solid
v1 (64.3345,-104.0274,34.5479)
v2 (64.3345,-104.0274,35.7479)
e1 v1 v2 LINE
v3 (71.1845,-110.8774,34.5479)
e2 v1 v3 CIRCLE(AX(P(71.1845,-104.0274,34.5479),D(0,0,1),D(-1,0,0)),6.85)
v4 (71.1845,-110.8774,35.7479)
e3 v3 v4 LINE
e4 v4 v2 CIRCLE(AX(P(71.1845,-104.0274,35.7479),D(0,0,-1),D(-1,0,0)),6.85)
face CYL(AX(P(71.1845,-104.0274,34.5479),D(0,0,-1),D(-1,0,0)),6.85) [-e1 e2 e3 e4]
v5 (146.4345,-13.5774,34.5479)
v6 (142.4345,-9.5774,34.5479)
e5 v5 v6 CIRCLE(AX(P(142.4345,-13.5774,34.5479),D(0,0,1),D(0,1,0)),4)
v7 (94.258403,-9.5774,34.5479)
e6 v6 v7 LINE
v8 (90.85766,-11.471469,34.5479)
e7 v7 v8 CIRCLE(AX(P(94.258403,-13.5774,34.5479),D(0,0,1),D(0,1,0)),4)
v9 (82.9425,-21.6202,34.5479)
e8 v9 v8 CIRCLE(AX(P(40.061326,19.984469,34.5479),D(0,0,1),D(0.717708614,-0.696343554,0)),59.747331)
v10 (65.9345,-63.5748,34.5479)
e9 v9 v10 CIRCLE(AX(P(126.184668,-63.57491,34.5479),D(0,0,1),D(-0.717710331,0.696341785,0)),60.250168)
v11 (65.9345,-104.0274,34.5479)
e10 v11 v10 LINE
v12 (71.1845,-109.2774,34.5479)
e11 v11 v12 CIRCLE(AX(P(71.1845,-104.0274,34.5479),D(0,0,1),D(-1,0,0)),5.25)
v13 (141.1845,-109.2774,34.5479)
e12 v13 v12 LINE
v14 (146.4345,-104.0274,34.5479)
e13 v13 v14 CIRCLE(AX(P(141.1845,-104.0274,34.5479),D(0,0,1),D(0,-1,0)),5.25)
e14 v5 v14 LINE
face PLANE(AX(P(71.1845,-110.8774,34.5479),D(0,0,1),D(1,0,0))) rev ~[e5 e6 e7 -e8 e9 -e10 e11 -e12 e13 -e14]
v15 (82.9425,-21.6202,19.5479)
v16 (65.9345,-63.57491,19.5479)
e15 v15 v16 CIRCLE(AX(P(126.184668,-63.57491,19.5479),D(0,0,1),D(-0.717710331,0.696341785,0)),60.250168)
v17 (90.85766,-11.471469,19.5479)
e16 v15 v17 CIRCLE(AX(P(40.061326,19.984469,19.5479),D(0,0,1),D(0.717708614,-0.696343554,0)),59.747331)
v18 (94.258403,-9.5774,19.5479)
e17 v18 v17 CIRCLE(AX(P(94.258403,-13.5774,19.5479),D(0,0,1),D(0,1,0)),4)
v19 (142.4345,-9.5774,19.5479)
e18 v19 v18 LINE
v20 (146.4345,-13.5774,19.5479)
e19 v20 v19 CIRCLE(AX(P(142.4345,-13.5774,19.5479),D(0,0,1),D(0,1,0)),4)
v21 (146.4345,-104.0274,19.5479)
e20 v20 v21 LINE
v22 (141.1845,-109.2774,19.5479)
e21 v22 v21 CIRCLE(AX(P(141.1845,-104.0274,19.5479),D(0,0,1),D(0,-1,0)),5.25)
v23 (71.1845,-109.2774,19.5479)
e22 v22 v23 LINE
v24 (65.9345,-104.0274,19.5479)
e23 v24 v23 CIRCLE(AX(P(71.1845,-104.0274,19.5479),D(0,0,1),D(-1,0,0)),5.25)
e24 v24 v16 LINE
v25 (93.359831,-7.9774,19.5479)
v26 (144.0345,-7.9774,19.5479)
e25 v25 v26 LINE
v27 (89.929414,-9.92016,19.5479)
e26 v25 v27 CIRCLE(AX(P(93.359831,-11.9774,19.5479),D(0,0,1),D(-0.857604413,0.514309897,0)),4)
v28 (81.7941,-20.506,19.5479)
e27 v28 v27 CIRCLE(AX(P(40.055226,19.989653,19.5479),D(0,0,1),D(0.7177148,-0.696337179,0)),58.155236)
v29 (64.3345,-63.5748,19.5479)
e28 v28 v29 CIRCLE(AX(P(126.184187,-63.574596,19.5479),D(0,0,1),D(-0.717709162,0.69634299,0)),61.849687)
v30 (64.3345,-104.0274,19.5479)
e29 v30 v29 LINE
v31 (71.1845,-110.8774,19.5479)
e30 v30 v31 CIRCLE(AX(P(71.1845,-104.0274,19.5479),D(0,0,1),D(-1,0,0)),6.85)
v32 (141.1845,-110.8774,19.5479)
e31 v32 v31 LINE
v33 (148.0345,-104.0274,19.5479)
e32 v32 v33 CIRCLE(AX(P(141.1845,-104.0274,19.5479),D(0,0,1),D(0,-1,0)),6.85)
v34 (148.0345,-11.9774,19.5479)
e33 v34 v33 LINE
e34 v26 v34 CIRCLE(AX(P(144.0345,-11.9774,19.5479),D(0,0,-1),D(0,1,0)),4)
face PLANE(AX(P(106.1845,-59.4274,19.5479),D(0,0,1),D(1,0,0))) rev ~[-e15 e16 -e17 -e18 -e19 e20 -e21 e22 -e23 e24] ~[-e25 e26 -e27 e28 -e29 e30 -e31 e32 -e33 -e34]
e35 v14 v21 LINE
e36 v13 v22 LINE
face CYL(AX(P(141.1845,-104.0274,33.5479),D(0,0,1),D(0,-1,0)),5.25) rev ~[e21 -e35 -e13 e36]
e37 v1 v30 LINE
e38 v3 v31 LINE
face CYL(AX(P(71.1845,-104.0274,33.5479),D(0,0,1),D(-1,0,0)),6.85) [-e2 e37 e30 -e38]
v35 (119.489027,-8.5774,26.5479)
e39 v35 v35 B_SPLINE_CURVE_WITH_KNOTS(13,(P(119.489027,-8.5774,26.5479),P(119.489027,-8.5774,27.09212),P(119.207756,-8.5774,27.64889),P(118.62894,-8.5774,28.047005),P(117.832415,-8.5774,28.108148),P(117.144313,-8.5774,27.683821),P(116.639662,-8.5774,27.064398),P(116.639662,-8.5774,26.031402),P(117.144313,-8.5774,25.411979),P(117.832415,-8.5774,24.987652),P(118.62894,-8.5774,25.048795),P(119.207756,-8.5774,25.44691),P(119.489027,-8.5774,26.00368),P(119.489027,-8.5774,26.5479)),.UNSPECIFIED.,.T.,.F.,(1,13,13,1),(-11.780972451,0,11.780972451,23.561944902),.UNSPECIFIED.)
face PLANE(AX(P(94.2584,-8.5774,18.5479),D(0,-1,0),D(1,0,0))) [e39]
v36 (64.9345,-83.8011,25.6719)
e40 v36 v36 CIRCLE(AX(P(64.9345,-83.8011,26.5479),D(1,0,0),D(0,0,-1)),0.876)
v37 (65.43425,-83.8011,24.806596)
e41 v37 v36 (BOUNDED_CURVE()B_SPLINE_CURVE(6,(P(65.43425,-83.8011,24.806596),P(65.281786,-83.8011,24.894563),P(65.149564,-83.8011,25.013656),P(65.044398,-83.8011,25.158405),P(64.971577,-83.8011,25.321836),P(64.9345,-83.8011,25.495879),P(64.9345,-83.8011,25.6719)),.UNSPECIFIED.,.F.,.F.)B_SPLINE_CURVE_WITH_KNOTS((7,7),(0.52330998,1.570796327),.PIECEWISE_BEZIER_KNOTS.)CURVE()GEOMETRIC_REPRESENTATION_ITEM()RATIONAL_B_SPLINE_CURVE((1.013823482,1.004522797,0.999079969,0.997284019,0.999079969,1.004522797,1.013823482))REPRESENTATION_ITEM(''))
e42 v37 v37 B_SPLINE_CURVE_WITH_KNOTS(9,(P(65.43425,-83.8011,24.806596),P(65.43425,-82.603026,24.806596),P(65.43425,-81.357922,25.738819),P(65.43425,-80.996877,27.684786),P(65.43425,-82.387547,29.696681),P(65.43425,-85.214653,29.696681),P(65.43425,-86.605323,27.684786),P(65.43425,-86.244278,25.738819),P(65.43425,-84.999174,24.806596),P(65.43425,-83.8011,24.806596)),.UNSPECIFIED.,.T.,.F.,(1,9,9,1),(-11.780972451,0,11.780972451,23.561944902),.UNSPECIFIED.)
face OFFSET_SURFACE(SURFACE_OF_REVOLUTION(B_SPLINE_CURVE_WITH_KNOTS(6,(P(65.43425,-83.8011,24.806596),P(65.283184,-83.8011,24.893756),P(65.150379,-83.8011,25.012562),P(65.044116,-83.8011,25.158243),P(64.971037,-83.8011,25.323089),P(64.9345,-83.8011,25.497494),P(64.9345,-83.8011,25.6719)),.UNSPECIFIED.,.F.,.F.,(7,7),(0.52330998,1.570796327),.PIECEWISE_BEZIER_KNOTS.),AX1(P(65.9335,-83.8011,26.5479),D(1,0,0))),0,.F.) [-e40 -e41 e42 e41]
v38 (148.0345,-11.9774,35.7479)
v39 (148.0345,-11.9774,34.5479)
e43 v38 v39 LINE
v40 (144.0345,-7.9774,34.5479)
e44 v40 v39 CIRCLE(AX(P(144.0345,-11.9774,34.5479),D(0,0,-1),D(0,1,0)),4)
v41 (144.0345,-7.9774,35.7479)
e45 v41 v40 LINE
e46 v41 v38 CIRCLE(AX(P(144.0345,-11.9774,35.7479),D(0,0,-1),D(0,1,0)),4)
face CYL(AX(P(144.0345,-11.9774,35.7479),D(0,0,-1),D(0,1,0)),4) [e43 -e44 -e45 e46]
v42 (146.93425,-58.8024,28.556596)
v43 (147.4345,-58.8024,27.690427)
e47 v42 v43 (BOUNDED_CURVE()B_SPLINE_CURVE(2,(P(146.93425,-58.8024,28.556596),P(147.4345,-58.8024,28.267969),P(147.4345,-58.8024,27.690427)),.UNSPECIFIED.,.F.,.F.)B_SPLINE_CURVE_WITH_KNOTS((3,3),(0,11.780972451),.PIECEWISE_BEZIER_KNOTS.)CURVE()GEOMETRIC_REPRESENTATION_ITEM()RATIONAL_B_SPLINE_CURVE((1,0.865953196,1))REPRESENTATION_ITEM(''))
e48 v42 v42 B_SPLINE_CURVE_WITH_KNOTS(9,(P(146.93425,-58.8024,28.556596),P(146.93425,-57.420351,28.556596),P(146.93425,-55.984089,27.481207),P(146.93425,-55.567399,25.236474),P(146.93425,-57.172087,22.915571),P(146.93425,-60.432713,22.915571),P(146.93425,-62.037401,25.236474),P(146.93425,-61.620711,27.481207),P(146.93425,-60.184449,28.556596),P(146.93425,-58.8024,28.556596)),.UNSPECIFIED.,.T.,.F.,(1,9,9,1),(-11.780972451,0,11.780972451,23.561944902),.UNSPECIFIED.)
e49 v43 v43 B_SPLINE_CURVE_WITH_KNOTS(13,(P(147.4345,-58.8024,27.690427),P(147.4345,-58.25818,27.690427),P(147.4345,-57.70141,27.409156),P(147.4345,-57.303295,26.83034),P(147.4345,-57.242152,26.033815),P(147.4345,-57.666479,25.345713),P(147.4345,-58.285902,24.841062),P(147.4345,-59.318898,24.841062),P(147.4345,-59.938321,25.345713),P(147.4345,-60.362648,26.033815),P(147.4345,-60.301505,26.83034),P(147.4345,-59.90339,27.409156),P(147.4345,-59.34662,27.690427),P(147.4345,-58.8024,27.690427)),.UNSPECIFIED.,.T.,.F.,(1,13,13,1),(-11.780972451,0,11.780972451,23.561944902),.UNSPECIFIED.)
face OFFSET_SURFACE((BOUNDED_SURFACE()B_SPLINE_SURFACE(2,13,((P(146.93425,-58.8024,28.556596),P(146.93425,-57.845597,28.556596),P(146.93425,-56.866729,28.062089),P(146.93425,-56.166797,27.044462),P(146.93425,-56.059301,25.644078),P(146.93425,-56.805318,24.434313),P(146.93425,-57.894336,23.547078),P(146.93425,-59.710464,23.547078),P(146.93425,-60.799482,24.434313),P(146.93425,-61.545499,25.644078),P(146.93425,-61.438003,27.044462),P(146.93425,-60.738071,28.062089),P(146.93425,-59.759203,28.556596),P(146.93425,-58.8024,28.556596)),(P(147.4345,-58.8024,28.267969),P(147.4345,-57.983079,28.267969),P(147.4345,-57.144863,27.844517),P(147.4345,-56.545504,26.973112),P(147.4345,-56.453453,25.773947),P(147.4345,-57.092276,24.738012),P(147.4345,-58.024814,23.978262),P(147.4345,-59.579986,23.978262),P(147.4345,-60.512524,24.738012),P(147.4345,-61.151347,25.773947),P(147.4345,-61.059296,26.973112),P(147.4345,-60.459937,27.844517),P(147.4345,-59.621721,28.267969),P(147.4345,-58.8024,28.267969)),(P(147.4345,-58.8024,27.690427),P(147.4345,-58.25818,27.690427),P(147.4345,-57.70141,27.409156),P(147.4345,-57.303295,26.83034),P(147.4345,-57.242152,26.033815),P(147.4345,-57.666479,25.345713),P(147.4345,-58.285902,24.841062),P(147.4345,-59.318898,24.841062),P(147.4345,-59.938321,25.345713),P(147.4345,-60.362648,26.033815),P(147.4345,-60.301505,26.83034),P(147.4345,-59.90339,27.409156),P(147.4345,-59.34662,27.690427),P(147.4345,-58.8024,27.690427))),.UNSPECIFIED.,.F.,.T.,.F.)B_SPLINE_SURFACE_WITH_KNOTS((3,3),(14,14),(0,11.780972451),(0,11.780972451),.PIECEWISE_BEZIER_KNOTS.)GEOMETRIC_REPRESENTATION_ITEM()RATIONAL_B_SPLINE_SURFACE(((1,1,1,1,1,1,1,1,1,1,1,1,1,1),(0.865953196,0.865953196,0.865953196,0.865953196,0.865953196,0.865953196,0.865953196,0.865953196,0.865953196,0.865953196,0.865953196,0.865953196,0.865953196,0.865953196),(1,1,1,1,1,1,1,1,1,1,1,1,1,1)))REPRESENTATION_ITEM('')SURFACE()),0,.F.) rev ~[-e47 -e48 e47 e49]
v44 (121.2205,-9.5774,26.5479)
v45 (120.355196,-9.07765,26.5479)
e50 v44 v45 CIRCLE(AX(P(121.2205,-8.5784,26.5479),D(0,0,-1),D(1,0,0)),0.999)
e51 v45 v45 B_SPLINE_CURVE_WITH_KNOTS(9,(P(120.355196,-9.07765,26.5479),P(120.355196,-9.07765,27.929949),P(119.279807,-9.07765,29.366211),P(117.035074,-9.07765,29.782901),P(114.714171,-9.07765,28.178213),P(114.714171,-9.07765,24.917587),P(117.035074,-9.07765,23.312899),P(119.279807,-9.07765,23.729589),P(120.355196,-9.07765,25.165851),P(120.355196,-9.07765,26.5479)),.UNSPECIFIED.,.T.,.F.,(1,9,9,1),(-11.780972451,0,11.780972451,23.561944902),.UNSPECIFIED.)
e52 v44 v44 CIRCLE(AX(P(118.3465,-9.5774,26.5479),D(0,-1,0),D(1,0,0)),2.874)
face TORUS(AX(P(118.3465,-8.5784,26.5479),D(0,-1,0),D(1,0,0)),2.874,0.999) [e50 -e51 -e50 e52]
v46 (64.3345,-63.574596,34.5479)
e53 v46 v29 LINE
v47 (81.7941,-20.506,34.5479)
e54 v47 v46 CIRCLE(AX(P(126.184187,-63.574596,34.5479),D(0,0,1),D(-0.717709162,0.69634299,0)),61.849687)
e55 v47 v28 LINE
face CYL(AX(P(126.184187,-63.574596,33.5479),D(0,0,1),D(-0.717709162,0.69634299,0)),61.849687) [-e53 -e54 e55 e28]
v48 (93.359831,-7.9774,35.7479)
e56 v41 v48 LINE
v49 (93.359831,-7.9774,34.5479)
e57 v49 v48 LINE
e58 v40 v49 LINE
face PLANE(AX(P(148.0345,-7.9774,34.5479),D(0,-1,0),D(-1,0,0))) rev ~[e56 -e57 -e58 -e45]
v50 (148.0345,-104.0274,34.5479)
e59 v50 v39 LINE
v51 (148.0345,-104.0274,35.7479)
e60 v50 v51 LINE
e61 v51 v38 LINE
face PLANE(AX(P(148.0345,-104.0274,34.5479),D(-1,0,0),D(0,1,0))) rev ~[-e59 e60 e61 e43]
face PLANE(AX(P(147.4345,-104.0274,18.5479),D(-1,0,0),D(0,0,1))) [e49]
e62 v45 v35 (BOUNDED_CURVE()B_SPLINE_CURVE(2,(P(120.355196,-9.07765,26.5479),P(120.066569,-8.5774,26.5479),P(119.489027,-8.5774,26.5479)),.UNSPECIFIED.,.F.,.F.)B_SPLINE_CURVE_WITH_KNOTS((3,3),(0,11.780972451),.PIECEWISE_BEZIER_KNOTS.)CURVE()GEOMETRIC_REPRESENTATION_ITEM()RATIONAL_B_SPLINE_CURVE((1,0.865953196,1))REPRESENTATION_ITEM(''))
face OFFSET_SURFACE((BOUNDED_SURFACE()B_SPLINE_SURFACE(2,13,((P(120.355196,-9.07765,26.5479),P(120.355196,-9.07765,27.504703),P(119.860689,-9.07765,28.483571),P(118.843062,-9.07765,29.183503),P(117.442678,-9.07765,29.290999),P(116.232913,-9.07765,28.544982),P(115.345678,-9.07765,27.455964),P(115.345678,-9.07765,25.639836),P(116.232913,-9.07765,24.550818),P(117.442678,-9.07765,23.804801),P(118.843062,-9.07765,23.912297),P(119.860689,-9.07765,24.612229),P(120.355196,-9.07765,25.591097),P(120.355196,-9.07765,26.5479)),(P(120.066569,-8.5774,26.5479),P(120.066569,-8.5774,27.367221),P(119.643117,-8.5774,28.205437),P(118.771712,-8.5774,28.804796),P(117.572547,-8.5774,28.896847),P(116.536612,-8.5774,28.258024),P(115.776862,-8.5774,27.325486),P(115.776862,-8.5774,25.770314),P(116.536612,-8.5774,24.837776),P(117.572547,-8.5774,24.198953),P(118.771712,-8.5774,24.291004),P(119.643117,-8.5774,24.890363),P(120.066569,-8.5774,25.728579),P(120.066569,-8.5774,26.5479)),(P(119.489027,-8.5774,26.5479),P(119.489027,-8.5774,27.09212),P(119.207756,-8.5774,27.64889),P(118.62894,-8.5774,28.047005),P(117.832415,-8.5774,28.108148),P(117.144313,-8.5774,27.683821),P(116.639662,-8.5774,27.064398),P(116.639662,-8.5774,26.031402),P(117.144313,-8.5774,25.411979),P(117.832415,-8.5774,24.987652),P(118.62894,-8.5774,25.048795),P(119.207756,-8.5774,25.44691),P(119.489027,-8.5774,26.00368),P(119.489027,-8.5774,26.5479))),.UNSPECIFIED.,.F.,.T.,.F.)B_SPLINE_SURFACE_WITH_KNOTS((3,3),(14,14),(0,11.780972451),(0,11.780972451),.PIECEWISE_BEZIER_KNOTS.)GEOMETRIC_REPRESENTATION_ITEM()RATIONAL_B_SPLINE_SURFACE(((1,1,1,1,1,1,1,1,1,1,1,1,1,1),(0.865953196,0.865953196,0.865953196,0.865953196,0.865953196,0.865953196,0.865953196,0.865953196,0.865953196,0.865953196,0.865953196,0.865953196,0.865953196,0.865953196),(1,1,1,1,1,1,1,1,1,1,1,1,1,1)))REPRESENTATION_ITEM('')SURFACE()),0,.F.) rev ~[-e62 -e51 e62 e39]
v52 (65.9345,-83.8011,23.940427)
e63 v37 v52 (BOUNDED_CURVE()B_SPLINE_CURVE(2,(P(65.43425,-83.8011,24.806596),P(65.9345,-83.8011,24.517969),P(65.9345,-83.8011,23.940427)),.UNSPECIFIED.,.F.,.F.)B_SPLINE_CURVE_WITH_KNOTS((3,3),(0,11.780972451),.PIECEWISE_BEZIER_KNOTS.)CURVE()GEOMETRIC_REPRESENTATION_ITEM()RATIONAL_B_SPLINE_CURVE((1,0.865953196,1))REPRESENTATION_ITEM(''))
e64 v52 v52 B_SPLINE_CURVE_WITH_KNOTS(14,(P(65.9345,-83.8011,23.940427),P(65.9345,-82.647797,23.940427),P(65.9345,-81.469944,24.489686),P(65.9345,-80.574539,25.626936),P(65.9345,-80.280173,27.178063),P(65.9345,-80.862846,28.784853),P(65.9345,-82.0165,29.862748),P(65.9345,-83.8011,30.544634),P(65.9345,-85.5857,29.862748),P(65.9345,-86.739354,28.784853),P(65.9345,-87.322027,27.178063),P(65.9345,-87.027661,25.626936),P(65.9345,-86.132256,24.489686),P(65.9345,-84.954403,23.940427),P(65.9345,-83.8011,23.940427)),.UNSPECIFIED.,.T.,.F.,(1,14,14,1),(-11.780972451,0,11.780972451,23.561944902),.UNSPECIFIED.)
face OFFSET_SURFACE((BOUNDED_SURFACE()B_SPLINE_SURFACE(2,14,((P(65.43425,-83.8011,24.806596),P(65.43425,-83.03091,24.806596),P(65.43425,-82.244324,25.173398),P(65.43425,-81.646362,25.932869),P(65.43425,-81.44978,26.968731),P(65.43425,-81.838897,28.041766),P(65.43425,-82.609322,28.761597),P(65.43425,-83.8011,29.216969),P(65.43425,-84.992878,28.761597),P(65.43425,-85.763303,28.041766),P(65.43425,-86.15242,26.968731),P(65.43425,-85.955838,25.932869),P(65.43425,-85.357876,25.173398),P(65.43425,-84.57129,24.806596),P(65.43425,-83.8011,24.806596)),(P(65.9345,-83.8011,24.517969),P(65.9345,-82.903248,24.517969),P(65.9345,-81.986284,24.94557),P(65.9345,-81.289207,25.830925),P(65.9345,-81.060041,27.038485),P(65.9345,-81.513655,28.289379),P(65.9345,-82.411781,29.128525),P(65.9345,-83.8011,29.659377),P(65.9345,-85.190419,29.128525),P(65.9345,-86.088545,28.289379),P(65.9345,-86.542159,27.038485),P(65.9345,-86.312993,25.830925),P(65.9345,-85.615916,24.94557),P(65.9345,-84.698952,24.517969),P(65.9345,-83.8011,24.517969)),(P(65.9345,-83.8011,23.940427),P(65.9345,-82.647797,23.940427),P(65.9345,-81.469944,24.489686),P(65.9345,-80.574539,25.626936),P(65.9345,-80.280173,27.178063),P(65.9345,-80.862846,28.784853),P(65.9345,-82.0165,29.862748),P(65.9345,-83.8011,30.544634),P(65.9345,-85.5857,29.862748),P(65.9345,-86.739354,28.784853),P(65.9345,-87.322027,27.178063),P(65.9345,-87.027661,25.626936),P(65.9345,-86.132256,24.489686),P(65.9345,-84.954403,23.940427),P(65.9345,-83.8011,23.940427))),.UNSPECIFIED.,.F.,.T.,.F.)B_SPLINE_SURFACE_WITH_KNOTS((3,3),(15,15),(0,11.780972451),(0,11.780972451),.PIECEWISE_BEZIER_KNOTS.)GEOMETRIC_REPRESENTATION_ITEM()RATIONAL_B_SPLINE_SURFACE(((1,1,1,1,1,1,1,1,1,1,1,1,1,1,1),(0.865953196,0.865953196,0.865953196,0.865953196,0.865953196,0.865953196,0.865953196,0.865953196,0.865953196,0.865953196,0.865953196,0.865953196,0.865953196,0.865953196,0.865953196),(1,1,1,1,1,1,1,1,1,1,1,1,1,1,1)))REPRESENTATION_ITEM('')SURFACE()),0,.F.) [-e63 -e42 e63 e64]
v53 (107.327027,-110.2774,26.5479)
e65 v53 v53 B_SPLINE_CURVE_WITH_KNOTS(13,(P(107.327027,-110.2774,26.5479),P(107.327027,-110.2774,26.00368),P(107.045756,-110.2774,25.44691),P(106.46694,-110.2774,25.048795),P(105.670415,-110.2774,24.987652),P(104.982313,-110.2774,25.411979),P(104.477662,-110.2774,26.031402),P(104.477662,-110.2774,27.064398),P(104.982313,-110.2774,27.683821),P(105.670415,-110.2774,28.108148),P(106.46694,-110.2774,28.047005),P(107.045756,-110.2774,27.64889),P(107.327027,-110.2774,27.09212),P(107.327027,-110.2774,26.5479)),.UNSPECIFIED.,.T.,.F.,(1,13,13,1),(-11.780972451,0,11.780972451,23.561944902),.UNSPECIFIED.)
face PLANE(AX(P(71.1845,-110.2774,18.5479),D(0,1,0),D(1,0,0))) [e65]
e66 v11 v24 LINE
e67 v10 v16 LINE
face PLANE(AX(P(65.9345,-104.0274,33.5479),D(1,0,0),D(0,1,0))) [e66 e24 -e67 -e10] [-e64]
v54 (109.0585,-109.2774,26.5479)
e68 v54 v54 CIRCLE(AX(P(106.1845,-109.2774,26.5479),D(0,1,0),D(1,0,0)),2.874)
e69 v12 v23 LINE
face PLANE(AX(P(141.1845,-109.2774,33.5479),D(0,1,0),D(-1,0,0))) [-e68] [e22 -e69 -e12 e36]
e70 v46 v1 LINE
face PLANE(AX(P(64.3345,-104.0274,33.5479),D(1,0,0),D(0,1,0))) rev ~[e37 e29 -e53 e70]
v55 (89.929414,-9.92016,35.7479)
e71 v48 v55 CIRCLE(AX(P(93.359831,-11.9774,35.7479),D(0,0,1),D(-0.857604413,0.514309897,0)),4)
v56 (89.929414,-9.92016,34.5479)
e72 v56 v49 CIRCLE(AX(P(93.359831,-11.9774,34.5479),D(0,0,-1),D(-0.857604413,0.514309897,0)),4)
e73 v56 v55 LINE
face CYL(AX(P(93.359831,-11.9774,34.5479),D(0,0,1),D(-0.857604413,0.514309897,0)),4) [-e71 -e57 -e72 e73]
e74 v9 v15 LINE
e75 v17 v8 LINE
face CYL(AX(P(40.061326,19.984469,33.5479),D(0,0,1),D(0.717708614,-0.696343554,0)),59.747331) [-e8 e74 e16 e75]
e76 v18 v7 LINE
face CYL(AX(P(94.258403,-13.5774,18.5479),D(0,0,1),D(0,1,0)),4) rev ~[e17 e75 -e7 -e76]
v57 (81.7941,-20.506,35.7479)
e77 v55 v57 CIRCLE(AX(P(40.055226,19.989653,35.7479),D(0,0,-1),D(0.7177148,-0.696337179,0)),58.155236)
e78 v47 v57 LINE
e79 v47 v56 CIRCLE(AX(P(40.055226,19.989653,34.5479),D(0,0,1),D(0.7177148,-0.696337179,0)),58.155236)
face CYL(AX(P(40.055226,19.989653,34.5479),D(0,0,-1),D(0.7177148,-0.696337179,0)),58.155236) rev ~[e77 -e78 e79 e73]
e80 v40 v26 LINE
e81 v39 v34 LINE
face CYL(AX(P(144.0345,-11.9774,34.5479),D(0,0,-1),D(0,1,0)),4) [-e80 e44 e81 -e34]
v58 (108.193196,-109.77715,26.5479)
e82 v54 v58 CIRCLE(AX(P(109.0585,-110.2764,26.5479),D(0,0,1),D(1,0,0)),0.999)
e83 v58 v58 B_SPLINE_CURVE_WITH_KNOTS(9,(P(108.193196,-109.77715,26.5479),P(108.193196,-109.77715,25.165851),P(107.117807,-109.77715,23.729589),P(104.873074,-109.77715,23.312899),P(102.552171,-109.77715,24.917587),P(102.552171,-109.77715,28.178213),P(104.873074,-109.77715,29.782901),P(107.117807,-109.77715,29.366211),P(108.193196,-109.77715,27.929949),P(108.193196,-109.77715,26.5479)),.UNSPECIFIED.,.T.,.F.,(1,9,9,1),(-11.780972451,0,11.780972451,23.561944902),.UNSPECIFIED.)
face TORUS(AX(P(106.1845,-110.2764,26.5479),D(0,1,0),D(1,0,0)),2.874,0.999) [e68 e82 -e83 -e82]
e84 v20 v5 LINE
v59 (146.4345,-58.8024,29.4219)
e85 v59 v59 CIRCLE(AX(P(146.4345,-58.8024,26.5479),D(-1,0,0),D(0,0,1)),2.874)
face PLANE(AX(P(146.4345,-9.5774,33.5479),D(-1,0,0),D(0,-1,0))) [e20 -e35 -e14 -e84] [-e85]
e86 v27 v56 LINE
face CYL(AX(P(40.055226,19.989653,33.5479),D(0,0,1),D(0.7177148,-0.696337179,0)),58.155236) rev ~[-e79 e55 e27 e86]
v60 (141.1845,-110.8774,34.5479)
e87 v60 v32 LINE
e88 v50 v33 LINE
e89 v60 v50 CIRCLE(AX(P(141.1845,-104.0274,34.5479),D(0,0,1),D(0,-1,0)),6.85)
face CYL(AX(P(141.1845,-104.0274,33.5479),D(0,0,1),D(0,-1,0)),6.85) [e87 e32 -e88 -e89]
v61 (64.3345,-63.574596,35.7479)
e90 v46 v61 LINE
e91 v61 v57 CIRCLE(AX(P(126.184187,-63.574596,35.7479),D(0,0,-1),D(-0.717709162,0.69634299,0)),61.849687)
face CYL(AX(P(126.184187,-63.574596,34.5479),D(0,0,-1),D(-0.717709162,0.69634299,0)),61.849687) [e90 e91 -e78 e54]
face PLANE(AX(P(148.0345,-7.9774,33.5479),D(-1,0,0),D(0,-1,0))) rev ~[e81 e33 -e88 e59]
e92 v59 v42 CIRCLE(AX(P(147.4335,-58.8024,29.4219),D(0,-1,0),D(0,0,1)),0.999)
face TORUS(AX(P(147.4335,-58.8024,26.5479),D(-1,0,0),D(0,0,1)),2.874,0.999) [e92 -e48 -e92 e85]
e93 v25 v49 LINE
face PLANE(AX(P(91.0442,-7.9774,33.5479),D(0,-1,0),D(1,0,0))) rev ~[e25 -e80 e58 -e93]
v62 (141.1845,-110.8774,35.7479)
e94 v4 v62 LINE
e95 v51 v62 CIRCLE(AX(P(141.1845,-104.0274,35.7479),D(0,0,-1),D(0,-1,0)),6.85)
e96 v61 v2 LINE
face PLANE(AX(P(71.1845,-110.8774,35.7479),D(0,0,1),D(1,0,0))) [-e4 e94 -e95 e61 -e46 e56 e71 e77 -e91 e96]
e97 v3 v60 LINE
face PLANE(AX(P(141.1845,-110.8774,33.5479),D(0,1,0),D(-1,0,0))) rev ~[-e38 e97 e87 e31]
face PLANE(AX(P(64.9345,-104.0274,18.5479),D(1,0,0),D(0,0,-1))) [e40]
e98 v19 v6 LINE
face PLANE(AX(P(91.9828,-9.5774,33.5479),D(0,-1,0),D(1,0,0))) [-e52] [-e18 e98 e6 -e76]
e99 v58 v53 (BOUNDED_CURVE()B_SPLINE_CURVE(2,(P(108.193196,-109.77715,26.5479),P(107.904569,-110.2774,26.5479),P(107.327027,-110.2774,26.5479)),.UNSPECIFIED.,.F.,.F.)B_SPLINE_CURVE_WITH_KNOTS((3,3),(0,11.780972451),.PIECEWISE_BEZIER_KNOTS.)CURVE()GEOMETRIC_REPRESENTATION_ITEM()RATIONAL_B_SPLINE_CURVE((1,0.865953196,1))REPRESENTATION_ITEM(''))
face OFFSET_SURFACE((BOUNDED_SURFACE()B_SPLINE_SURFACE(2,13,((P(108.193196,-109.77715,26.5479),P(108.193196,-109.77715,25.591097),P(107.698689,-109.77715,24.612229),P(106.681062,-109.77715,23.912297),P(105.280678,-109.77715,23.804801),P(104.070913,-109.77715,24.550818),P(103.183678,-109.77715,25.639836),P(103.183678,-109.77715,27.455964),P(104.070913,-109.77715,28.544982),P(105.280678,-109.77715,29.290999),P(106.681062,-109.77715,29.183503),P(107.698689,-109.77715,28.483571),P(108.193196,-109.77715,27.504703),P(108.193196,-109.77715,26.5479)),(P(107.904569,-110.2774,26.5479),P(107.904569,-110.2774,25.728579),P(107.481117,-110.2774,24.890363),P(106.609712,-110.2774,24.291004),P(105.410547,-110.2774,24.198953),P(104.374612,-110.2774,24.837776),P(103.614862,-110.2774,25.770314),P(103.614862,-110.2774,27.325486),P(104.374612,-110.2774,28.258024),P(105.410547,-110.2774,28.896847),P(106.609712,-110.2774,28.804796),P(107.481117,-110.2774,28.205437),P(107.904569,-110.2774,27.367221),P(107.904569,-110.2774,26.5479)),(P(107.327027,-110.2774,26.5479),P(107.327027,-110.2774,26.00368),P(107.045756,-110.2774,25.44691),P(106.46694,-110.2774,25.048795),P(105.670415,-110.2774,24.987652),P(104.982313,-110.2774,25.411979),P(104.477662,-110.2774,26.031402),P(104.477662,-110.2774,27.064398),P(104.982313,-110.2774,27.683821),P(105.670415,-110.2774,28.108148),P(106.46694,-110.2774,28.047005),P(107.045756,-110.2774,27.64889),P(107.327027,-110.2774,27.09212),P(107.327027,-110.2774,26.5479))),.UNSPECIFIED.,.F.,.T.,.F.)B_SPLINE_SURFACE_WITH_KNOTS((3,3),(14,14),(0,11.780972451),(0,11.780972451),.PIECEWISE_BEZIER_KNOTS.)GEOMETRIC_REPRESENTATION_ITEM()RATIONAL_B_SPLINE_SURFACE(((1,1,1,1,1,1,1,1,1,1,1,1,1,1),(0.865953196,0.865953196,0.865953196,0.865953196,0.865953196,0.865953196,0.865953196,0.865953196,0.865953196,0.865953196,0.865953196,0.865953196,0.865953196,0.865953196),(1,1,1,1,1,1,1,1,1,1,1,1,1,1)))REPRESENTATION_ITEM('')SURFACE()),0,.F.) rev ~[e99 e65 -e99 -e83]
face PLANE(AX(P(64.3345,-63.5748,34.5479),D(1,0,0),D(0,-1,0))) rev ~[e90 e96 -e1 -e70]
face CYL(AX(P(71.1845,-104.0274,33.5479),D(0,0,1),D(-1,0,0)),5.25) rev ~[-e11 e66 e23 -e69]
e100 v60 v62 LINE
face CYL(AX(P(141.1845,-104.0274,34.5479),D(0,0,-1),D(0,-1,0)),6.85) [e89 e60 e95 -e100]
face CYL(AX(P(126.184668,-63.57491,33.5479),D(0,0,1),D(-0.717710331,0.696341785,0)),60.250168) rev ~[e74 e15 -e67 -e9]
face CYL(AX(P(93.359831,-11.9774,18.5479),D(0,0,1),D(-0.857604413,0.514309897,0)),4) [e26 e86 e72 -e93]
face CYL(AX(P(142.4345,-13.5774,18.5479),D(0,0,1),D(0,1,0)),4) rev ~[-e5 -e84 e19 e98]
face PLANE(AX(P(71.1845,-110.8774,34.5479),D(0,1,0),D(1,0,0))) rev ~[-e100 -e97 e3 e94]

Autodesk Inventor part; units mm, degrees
ref_plane "YZ Plane" through (0, 0, 0) normal (1, 0, 0) x (0, 1, 0)
ref_plane "XZ Plane" through (0, 0, 0) normal (0, 1, 0) x (-1, 0, 0)
ref_plane "XY Plane" through (0, 0, 0) normal (0, 0, 1) x (1, 0, 0)
ref_plane "Work Plane1" through (106.1845, -59.4274, 33.5479) normal (0, 0, 1) x (1, 0, 0)
sketch "Sketch2" plane through (106.1845, -59.4274, 33.5479) normal (0, 0, 1) x (1, 0, 0)
  arc A0 (-23.0626, 37.6331) -> (-14.0565, 49.6) centre (-66.1252, 79.4136) ccw
  line L0 (40, 49.6) -> (-14.0565, 49.6)
  arc A1 (-23.0626, 37.6331) -> (-40, -4.1474) centre (20, -4.1474) ccw construction
  line L1 (-40, -4.1474) -> (-40, -44.6)
  line L2 (-35, -49.6) -> (35, -49.6)
  arc A2 (-40, -44.6) -> (-35, -49.6) centre (-35, -44.6) ccw
  arc A3 (35, -49.6) -> (40, -44.6) centre (35, -44.6) ccw
  line L3 (40, -44.6) -> (40, 49.6)
  arc A4 (-23.242, 37.8072) -> (-40.25, -4.1474) centre (20, -4.1474) ccw
  arc A5 (-23.242, 37.8072) -> (-14.2017, 49.85) centre (-66.1252, 79.4136) ccw
  line L4 (-14.2017, 49.85) -> (40.25, 49.85)
  line L5 (40.25, 49.85) -> (40.25, -44.6)
  arc A6 (35, -49.85) -> (40.25, -44.6) centre (35, -44.6) ccw
  line L6 (35, -49.85) -> (-35, -49.85)
  arc A7 (-40.25, -44.6) -> (-35, -49.85) centre (-35, -44.6) ccw
  line L7 (-40.25, -44.6) -> (-40.25, -4.1474)
  arc A8 (-24.3904, 38.9214) -> (-41.85, -4.1474) centre (20, -4.1474) ccw
  arc A9 (-24.3904, 38.9214) -> (-15.1403, 51.45) centre (-66.1252, 79.4136) ccw
  line L8 (-15.1403, 51.45) -> (41.85, 51.45)
  line L9 (41.85, 51.45) -> (41.85, -44.6)
  arc A10 (35, -51.45) -> (41.85, -44.6) centre (35, -44.6) ccw
  line L10 (35, -51.45) -> (-35, -51.45)
  arc A11 (-41.85, -44.6) -> (-35, -51.45) centre (-35, -44.6) ccw
  line L11 (-41.85, -44.6) -> (-41.85, -4.1474)
  point P0 (-106.1845, 59.4274)
  dimension "d0" = 0.25
  dimension "d1" = 1.6
extrude "Extrusion1" add sketch "Sketch2" against normal blind 15
thicken "Thicken1" operation add thickness 1 both sides no extend neighbours yes toward (0, 0, 1) faces at (147.5012, -40.5274, 33.5479)
sketch "Sketch3" plane through (71.1845, -110.8774, 34.5479) normal (0, 0, 1) x (1, 0, 0)
  line L0 (0, 0) -> (70, 0) projected
  arc A0 (70, 0) -> (76.85, 6.85) centre (70, 6.85) ccw projected
  line L1 (76.85, 6.85) -> (76.85, 102.9) projected
  line L2 (76.85, 102.9) -> (19.8597, 102.9) projected
  arc A1 (10.6096, 90.3714) -> (19.8597, 102.9) centre (-31.1252, 130.8636) ccw projected
  arc A2 (10.6096, 90.3714) -> (-6.85, 47.3026) centre (55, 47.3026) ccw projected
  line L3 (-6.85, 47.3026) -> (-6.85, 6.85) projected
  arc A3 (-6.85, 6.85) -> (0, 0) centre (0, 6.85) ccw projected
  arc A4 (70, 1.6) -> (75.25, 6.85) centre (70, 6.85) ccw projected
  line L4 (70, 1.6) -> (0, 1.6) projected
  arc A5 (-5.25, 6.85) -> (0, 1.6) centre (0, 6.85) ccw projected
  line L5 (-5.25, 6.85) -> (-5.25, 47.3026) projected
  arc A6 (11.758, 89.2572) -> (-5.25, 47.3026) centre (55, 47.3026) ccw projected
  arc A7 (11.758, 89.2572) -> (20.7983, 101.3) centre (-31.1252, 130.8636) ccw projected
  line L6 (20.7983, 101.3) -> (75.25, 101.3) projected
  line L7 (75.25, 101.3) -> (75.25, 6.85) projected
  point P0 (-71.1845, 110.8774)
extrude "Extrusion2" add sketch "Sketch3" along normal blind 1.2 contours A3 L3 A2 A1 L2 L1 A0 L0 | L4 A5 L5 A6 A7 L6 L7 A4
fillet "Fillet1" radius 4 4 edges at (91.0442, -7.9774, 27.1479) (148.0345, -7.9774, 27.1479) (146.4345, -9.5774, 26.5479) (91.9828, -9.5774, 26.5479)
sketch "Sketch4" plane through (94.2584, -9.5774, 18.5479) normal (0, -1, 0) x (1, 0, 0)
  line L0 (0, 0) -> (0, 16) construction
  line L1 (48.1761, 0) -> (0, 0) construction
  line L2 (48.1761, 16) -> (48.1761, 0) construction
  line L3 (0, 16) -> (48.1761, 16) construction
  circle A0 centre (24.0881, 8) radius 1.875
  line L4 (0, 0) -> (0, 16) projected
  point P0 (-94.2584, -18.5479)
  point P1 (0, 8)
  point P2 (24.0881, 0)
  dimension "d11" = 3.75
extrude "Extrusion3" cut sketch "Sketch4" against normal blind 1
sketch "Sketch5" plane through (146.4345, -104.0274, 18.5479) normal (-1, 0, 0) x (0, 0, 1)
  circle A0 centre (8, 45.225) radius 1.875
  line L0 (0, 0) -> (0, 90.45) construction
  line L1 (16, 0) -> (0, 0) construction
  point P0 (-18.5479, 104.0274)
  point P1 (0, 45.225)
  point P2 (8, 0)
  dimension "d15" = 3.75
extrude "Extrusion4" cut sketch "Sketch5" against normal blind 1
sketch "Sketch6" plane through (71.1845, -109.2774, 18.5479) normal (0, 1, 0) x (1, 0, 0)
  circle A0 centre (35, -8) radius 1.875
  line L0 (70, -16) -> (70, 0) projected
  line L1 (0, 0) -> (70, 0) projected
  point P0 (-71.1845, 18.5479)
  point P1 (35, 0)
  point P2 (70, -8)
  dimension "d19" = 3.75
sketch "Sketch7" plane through (65.9345, -104.0274, 18.5479) normal (1, 0, 0) x (0, 0, -1)
  circle A0 centre (-8, 20.2263) radius 1.875
  line L0 (-16, 40.4526) -> (0, 40.4526) projected
  line L1 (0, 40.4526) -> (0, 0) projected
  point P0 (18.5479, 104.0274)
  point P1 (-8, 40.4526)
  point P2 (0, 20.2263)
  dimension "d20" = 3.75
extrude "Extrusion5" cut sketch "Sketch7" against normal blind 1
extrude "Extrusion6" cut sketch "Sketch6" against normal blind 1
fillet "Fillet4" radius 1 8 edges at (64.9345, -83.8011, 28.4229) (65.9345, -83.8011, 28.4229) (104.3095, -109.2774, 26.5479) (104.3095, -110.2774, 26.5479) (146.4345, -58.8024, 24.6729) (147.4345, -58.8024, 24.6729) (116.4715, -9.5774, 26.5479) (116.4715, -8.5774, 26.5479)
thicken "Thicken2" operation add thickness 1 both sides no extend neighbours yes toward (0, 0, 1) faces at (147.5012, -43.1941, 18.5479)
properties part number "WemosCover"
